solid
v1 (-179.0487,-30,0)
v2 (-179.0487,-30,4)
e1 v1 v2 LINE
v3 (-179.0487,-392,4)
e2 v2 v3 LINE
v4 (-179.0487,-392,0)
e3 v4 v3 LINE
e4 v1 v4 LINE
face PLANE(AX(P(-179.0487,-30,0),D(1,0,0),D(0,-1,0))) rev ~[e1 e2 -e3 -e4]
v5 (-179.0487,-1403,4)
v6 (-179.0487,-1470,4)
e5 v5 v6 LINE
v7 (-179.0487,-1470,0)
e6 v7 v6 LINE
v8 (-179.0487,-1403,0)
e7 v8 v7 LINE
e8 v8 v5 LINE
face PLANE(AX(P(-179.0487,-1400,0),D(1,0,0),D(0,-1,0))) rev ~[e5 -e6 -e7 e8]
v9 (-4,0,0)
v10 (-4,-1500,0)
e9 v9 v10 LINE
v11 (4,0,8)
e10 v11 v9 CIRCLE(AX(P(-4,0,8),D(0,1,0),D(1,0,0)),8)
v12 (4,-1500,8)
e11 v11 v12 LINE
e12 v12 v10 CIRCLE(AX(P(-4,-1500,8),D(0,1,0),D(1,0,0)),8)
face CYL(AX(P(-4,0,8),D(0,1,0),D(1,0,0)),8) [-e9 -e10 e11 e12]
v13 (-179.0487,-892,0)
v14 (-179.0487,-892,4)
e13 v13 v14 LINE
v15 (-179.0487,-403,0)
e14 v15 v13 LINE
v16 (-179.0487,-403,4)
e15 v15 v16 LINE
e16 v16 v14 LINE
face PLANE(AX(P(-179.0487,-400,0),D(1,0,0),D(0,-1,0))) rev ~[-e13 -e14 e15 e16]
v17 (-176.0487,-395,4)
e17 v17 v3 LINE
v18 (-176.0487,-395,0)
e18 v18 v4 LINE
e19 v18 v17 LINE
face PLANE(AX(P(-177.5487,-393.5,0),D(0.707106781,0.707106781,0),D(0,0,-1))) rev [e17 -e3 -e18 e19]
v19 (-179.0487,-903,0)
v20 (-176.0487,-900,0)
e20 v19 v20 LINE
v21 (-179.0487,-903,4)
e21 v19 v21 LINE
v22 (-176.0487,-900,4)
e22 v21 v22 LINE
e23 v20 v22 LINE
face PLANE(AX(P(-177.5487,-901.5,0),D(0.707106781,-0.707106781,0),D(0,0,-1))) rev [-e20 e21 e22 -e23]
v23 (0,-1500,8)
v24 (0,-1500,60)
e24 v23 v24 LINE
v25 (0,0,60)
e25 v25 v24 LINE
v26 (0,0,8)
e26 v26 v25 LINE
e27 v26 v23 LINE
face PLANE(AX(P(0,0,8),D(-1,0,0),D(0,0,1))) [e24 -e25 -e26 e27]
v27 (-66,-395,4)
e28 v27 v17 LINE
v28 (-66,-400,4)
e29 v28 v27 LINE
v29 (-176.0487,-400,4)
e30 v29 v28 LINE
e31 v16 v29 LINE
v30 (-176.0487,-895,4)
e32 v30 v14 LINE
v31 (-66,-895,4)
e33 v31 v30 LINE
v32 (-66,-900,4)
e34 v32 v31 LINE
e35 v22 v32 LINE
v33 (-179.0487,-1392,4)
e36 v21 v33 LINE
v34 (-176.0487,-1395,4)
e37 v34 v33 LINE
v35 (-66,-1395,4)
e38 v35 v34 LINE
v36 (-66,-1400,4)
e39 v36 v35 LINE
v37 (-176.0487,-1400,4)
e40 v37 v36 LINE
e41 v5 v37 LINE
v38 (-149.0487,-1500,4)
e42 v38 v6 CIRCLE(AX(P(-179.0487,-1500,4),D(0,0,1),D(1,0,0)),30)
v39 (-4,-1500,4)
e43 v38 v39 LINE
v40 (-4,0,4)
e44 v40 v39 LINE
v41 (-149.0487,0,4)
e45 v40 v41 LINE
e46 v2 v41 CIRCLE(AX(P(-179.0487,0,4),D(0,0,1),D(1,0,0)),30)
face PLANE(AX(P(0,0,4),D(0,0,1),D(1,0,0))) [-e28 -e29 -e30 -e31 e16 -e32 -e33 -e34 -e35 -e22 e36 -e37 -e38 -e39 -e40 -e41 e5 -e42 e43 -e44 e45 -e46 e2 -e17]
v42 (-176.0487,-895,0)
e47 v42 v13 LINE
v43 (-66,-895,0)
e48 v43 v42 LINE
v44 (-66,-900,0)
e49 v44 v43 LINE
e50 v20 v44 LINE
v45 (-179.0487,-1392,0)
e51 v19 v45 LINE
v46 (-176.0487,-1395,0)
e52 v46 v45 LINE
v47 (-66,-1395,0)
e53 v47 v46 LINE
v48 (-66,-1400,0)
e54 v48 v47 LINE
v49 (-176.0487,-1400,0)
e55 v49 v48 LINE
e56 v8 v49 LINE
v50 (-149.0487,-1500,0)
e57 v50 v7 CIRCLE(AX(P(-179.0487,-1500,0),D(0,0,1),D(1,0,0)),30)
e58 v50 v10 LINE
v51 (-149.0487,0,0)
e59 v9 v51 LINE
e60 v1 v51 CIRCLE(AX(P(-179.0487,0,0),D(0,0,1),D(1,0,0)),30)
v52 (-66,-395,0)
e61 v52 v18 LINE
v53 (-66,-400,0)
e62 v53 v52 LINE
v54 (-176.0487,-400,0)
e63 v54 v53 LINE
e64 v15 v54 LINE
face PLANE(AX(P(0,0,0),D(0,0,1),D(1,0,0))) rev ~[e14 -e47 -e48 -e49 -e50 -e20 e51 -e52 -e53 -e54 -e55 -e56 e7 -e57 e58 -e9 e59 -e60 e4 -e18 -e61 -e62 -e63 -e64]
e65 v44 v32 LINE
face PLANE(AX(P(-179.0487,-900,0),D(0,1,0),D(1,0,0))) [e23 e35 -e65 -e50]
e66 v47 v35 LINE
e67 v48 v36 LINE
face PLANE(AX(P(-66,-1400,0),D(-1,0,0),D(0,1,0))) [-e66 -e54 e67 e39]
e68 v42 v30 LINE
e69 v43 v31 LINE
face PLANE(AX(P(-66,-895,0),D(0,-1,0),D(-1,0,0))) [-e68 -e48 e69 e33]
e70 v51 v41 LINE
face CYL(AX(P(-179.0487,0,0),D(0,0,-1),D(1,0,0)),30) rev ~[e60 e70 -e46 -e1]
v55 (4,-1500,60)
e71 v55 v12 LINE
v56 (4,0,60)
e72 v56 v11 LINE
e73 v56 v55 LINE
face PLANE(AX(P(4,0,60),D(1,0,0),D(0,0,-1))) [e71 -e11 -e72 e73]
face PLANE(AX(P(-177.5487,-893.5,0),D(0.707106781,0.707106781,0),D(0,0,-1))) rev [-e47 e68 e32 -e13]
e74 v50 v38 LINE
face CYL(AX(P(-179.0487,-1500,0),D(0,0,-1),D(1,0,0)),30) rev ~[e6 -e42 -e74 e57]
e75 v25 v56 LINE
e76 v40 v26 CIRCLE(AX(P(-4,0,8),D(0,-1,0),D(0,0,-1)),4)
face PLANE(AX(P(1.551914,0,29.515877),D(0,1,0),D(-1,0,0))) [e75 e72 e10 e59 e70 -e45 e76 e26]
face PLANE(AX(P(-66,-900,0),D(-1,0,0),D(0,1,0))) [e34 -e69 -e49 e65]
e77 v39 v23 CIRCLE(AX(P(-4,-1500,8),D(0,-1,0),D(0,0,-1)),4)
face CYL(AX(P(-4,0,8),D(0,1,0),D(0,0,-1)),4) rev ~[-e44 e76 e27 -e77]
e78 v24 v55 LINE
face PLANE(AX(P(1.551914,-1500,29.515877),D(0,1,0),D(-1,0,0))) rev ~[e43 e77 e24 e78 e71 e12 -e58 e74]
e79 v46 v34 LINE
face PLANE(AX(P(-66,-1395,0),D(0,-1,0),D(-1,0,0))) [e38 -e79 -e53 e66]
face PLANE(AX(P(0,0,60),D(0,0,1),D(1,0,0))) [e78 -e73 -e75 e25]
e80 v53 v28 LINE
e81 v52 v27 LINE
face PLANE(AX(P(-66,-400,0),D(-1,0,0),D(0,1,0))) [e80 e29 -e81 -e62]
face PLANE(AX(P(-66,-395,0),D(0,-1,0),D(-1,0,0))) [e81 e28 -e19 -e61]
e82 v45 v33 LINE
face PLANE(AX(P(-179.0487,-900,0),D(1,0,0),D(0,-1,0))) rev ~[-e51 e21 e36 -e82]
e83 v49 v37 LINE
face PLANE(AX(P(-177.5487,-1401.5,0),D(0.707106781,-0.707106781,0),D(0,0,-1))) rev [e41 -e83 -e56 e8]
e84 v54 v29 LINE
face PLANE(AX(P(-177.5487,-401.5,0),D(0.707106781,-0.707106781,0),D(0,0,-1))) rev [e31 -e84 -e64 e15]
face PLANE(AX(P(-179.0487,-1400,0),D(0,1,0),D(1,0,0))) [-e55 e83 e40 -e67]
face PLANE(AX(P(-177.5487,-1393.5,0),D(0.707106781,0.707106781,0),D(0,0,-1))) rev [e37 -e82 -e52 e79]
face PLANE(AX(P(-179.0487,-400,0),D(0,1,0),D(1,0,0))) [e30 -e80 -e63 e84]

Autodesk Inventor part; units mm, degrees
ref_plane "YZ Plane" through (0, 0, 0) normal (1, 0, 0) x (0, 1, 0)
ref_plane "XZ Plane" through (0, 0, 0) normal (0, 1, 0) x (-1, 0, 0)
ref_plane "XY Plane" through (0, 0, 0) normal (0, 0, 1) x (1, 0, 0)
sketch "Sketch1" plane through (0, 0, 0) normal (0, 0, 1) x (1, 0, 0)
  line L0 (0, 0) -> (-179.0487, 0)
  line L1 (-179.0487, 0) -> (-179.0487, -1500)
  line L2 (-179.0487, -1500) -> (0, -1500)
  line L3 (0, -1500) -> (0, 0)
  line L4 (-179.0487, -1400) -> (-66, -1400)
  line L5 (-66, -1400) -> (-66, -1395)
  line L6 (-66, -1395) -> (-179.0487, -1395)
  line L7 (-179.0487, -1395) -> (-179.0487, -1400)
  line L8 (-179.0487, -900) -> (-66, -900)
  line L9 (-66, -900) -> (-66, -895)
  line L10 (-66, -895) -> (-179.0487, -895)
  line L11 (-179.0487, -895) -> (-179.0487, -900)
  line L12 (-179.0487, -400) -> (-66, -400)
  line L13 (-66, -400) -> (-66, -395)
  line L14 (-66, -395) -> (-179.0487, -395)
  line L15 (-179.0487, -395) -> (-179.0487, -400)
  circle A0 centre (-179.0487, 0) radius 30
  circle A1 centre (-179.0487, -1500) radius 30
  point P0 (-179.0487, -400)
  point P1 (-149.0487, 0)
  point P2 (-179.0487, -30)
  point P3 (-179.0487, -1470)
  point P4 (-149.0487, -1500)
  dimension "d0" = 1500
  dimension "d1" = 179.0487
  dimension "d2" = 5
  dimension "d4" = 100
  dimension "d7" = 500
  dimension "d23" = 66
  dimension "d24" = 60
extrude "Plate1" add sketch "Sketch1" along normal blind 4 contours L3 L2 A1 L1 L4 L5 L6 L8 L9 L10 L12 L13 L14 A0 L0
sketch "Sketch2" plane through (4, 0, 0) normal (-1, 0, 0) x (0, -1, 0)
  line L0 (1500, 0) -> (0, 0)
  line L1 (0, 0) -> (0, 60)
  line L2 (0, 60) -> (1500, 60)
  line L3 (1500, 60) -> (1500, 0)
edge flange "Flange1" height 60 angle 90 thickness 4 bend radius 4 thickness toward (-1, 0, 0) relief tear relief width 4 relief depth 2 edges at (0, -750, 4) wall of the first edge with corners at (4, -1500, 0) (4, 0, 0) (4, 0, 60) (4, -1500, 60)
bend "Bend1"
corner "Corner1"
chamfer "Corner Chamfer1" distance 3 angle 45 6 edges at (-179.0487, -1400, 2) (-179.0487, -1395, 2) (-179.0487, -900, 2) (-179.0487, -895, 2) (-179.0487, -395, 2) (-179.0487, -400, 2)
equation "\"d1\" = стрингер_глубина_2"
equation "\"d2\" = паз_под_стрингер_толщина"
equation "\"d23\" = паз_под_стрингер_глубина - Thickness"
equation "\"d24\" = 2 * радиус_выреза_под_сварку"
equation "\"d12\" = Thickness"
equation "\"d13\" = BendReliefWidth"
equation "\"d14\" = BendReliefDepth"
equation "\"d15\" = MinimumRemnant"
equation "\"d16\" = TransitionRadius"
equation "\"d17\" = ребро_усилителей"
equation "\"d19\" = BendRadius"
equation "\"d20\" = CornerReliefSize"
equation "\"d21\" = GapSize"
equation "\"d22\" = JacobiRadiusSize"
equation "\"BendRadius\" = Thickness"
equation "\"BendReliefWidth\" = Thickness"
equation "\"BendReliefDepth\" = 0.5 * Thickness"
equation "\"CornerReliefSize\" = 4 * Thickness"
equation "\"MinimumRemnant\" = 2 * Thickness"
equation "\"TransitionRadius\" = BendRadius"
equation "\"JacobiRadiusSize\" = BendRadius"
equation "\"GapSize\" = Thickness"
equation "\"стрингер_глубина_2\" = 179.048739"
equation "\"паз_под_стрингер_толщина\" = 5"
equation "\"паз_под_стрингер_глубина\" = 70"
equation "\"Thickness\" = 4"
equation "\"радиус_выреза_под_сварку\" = 30"
equation "\"ребро_усилителей\" = 60"
properties part number "0233 GBK stringer 3" material "Steel"
